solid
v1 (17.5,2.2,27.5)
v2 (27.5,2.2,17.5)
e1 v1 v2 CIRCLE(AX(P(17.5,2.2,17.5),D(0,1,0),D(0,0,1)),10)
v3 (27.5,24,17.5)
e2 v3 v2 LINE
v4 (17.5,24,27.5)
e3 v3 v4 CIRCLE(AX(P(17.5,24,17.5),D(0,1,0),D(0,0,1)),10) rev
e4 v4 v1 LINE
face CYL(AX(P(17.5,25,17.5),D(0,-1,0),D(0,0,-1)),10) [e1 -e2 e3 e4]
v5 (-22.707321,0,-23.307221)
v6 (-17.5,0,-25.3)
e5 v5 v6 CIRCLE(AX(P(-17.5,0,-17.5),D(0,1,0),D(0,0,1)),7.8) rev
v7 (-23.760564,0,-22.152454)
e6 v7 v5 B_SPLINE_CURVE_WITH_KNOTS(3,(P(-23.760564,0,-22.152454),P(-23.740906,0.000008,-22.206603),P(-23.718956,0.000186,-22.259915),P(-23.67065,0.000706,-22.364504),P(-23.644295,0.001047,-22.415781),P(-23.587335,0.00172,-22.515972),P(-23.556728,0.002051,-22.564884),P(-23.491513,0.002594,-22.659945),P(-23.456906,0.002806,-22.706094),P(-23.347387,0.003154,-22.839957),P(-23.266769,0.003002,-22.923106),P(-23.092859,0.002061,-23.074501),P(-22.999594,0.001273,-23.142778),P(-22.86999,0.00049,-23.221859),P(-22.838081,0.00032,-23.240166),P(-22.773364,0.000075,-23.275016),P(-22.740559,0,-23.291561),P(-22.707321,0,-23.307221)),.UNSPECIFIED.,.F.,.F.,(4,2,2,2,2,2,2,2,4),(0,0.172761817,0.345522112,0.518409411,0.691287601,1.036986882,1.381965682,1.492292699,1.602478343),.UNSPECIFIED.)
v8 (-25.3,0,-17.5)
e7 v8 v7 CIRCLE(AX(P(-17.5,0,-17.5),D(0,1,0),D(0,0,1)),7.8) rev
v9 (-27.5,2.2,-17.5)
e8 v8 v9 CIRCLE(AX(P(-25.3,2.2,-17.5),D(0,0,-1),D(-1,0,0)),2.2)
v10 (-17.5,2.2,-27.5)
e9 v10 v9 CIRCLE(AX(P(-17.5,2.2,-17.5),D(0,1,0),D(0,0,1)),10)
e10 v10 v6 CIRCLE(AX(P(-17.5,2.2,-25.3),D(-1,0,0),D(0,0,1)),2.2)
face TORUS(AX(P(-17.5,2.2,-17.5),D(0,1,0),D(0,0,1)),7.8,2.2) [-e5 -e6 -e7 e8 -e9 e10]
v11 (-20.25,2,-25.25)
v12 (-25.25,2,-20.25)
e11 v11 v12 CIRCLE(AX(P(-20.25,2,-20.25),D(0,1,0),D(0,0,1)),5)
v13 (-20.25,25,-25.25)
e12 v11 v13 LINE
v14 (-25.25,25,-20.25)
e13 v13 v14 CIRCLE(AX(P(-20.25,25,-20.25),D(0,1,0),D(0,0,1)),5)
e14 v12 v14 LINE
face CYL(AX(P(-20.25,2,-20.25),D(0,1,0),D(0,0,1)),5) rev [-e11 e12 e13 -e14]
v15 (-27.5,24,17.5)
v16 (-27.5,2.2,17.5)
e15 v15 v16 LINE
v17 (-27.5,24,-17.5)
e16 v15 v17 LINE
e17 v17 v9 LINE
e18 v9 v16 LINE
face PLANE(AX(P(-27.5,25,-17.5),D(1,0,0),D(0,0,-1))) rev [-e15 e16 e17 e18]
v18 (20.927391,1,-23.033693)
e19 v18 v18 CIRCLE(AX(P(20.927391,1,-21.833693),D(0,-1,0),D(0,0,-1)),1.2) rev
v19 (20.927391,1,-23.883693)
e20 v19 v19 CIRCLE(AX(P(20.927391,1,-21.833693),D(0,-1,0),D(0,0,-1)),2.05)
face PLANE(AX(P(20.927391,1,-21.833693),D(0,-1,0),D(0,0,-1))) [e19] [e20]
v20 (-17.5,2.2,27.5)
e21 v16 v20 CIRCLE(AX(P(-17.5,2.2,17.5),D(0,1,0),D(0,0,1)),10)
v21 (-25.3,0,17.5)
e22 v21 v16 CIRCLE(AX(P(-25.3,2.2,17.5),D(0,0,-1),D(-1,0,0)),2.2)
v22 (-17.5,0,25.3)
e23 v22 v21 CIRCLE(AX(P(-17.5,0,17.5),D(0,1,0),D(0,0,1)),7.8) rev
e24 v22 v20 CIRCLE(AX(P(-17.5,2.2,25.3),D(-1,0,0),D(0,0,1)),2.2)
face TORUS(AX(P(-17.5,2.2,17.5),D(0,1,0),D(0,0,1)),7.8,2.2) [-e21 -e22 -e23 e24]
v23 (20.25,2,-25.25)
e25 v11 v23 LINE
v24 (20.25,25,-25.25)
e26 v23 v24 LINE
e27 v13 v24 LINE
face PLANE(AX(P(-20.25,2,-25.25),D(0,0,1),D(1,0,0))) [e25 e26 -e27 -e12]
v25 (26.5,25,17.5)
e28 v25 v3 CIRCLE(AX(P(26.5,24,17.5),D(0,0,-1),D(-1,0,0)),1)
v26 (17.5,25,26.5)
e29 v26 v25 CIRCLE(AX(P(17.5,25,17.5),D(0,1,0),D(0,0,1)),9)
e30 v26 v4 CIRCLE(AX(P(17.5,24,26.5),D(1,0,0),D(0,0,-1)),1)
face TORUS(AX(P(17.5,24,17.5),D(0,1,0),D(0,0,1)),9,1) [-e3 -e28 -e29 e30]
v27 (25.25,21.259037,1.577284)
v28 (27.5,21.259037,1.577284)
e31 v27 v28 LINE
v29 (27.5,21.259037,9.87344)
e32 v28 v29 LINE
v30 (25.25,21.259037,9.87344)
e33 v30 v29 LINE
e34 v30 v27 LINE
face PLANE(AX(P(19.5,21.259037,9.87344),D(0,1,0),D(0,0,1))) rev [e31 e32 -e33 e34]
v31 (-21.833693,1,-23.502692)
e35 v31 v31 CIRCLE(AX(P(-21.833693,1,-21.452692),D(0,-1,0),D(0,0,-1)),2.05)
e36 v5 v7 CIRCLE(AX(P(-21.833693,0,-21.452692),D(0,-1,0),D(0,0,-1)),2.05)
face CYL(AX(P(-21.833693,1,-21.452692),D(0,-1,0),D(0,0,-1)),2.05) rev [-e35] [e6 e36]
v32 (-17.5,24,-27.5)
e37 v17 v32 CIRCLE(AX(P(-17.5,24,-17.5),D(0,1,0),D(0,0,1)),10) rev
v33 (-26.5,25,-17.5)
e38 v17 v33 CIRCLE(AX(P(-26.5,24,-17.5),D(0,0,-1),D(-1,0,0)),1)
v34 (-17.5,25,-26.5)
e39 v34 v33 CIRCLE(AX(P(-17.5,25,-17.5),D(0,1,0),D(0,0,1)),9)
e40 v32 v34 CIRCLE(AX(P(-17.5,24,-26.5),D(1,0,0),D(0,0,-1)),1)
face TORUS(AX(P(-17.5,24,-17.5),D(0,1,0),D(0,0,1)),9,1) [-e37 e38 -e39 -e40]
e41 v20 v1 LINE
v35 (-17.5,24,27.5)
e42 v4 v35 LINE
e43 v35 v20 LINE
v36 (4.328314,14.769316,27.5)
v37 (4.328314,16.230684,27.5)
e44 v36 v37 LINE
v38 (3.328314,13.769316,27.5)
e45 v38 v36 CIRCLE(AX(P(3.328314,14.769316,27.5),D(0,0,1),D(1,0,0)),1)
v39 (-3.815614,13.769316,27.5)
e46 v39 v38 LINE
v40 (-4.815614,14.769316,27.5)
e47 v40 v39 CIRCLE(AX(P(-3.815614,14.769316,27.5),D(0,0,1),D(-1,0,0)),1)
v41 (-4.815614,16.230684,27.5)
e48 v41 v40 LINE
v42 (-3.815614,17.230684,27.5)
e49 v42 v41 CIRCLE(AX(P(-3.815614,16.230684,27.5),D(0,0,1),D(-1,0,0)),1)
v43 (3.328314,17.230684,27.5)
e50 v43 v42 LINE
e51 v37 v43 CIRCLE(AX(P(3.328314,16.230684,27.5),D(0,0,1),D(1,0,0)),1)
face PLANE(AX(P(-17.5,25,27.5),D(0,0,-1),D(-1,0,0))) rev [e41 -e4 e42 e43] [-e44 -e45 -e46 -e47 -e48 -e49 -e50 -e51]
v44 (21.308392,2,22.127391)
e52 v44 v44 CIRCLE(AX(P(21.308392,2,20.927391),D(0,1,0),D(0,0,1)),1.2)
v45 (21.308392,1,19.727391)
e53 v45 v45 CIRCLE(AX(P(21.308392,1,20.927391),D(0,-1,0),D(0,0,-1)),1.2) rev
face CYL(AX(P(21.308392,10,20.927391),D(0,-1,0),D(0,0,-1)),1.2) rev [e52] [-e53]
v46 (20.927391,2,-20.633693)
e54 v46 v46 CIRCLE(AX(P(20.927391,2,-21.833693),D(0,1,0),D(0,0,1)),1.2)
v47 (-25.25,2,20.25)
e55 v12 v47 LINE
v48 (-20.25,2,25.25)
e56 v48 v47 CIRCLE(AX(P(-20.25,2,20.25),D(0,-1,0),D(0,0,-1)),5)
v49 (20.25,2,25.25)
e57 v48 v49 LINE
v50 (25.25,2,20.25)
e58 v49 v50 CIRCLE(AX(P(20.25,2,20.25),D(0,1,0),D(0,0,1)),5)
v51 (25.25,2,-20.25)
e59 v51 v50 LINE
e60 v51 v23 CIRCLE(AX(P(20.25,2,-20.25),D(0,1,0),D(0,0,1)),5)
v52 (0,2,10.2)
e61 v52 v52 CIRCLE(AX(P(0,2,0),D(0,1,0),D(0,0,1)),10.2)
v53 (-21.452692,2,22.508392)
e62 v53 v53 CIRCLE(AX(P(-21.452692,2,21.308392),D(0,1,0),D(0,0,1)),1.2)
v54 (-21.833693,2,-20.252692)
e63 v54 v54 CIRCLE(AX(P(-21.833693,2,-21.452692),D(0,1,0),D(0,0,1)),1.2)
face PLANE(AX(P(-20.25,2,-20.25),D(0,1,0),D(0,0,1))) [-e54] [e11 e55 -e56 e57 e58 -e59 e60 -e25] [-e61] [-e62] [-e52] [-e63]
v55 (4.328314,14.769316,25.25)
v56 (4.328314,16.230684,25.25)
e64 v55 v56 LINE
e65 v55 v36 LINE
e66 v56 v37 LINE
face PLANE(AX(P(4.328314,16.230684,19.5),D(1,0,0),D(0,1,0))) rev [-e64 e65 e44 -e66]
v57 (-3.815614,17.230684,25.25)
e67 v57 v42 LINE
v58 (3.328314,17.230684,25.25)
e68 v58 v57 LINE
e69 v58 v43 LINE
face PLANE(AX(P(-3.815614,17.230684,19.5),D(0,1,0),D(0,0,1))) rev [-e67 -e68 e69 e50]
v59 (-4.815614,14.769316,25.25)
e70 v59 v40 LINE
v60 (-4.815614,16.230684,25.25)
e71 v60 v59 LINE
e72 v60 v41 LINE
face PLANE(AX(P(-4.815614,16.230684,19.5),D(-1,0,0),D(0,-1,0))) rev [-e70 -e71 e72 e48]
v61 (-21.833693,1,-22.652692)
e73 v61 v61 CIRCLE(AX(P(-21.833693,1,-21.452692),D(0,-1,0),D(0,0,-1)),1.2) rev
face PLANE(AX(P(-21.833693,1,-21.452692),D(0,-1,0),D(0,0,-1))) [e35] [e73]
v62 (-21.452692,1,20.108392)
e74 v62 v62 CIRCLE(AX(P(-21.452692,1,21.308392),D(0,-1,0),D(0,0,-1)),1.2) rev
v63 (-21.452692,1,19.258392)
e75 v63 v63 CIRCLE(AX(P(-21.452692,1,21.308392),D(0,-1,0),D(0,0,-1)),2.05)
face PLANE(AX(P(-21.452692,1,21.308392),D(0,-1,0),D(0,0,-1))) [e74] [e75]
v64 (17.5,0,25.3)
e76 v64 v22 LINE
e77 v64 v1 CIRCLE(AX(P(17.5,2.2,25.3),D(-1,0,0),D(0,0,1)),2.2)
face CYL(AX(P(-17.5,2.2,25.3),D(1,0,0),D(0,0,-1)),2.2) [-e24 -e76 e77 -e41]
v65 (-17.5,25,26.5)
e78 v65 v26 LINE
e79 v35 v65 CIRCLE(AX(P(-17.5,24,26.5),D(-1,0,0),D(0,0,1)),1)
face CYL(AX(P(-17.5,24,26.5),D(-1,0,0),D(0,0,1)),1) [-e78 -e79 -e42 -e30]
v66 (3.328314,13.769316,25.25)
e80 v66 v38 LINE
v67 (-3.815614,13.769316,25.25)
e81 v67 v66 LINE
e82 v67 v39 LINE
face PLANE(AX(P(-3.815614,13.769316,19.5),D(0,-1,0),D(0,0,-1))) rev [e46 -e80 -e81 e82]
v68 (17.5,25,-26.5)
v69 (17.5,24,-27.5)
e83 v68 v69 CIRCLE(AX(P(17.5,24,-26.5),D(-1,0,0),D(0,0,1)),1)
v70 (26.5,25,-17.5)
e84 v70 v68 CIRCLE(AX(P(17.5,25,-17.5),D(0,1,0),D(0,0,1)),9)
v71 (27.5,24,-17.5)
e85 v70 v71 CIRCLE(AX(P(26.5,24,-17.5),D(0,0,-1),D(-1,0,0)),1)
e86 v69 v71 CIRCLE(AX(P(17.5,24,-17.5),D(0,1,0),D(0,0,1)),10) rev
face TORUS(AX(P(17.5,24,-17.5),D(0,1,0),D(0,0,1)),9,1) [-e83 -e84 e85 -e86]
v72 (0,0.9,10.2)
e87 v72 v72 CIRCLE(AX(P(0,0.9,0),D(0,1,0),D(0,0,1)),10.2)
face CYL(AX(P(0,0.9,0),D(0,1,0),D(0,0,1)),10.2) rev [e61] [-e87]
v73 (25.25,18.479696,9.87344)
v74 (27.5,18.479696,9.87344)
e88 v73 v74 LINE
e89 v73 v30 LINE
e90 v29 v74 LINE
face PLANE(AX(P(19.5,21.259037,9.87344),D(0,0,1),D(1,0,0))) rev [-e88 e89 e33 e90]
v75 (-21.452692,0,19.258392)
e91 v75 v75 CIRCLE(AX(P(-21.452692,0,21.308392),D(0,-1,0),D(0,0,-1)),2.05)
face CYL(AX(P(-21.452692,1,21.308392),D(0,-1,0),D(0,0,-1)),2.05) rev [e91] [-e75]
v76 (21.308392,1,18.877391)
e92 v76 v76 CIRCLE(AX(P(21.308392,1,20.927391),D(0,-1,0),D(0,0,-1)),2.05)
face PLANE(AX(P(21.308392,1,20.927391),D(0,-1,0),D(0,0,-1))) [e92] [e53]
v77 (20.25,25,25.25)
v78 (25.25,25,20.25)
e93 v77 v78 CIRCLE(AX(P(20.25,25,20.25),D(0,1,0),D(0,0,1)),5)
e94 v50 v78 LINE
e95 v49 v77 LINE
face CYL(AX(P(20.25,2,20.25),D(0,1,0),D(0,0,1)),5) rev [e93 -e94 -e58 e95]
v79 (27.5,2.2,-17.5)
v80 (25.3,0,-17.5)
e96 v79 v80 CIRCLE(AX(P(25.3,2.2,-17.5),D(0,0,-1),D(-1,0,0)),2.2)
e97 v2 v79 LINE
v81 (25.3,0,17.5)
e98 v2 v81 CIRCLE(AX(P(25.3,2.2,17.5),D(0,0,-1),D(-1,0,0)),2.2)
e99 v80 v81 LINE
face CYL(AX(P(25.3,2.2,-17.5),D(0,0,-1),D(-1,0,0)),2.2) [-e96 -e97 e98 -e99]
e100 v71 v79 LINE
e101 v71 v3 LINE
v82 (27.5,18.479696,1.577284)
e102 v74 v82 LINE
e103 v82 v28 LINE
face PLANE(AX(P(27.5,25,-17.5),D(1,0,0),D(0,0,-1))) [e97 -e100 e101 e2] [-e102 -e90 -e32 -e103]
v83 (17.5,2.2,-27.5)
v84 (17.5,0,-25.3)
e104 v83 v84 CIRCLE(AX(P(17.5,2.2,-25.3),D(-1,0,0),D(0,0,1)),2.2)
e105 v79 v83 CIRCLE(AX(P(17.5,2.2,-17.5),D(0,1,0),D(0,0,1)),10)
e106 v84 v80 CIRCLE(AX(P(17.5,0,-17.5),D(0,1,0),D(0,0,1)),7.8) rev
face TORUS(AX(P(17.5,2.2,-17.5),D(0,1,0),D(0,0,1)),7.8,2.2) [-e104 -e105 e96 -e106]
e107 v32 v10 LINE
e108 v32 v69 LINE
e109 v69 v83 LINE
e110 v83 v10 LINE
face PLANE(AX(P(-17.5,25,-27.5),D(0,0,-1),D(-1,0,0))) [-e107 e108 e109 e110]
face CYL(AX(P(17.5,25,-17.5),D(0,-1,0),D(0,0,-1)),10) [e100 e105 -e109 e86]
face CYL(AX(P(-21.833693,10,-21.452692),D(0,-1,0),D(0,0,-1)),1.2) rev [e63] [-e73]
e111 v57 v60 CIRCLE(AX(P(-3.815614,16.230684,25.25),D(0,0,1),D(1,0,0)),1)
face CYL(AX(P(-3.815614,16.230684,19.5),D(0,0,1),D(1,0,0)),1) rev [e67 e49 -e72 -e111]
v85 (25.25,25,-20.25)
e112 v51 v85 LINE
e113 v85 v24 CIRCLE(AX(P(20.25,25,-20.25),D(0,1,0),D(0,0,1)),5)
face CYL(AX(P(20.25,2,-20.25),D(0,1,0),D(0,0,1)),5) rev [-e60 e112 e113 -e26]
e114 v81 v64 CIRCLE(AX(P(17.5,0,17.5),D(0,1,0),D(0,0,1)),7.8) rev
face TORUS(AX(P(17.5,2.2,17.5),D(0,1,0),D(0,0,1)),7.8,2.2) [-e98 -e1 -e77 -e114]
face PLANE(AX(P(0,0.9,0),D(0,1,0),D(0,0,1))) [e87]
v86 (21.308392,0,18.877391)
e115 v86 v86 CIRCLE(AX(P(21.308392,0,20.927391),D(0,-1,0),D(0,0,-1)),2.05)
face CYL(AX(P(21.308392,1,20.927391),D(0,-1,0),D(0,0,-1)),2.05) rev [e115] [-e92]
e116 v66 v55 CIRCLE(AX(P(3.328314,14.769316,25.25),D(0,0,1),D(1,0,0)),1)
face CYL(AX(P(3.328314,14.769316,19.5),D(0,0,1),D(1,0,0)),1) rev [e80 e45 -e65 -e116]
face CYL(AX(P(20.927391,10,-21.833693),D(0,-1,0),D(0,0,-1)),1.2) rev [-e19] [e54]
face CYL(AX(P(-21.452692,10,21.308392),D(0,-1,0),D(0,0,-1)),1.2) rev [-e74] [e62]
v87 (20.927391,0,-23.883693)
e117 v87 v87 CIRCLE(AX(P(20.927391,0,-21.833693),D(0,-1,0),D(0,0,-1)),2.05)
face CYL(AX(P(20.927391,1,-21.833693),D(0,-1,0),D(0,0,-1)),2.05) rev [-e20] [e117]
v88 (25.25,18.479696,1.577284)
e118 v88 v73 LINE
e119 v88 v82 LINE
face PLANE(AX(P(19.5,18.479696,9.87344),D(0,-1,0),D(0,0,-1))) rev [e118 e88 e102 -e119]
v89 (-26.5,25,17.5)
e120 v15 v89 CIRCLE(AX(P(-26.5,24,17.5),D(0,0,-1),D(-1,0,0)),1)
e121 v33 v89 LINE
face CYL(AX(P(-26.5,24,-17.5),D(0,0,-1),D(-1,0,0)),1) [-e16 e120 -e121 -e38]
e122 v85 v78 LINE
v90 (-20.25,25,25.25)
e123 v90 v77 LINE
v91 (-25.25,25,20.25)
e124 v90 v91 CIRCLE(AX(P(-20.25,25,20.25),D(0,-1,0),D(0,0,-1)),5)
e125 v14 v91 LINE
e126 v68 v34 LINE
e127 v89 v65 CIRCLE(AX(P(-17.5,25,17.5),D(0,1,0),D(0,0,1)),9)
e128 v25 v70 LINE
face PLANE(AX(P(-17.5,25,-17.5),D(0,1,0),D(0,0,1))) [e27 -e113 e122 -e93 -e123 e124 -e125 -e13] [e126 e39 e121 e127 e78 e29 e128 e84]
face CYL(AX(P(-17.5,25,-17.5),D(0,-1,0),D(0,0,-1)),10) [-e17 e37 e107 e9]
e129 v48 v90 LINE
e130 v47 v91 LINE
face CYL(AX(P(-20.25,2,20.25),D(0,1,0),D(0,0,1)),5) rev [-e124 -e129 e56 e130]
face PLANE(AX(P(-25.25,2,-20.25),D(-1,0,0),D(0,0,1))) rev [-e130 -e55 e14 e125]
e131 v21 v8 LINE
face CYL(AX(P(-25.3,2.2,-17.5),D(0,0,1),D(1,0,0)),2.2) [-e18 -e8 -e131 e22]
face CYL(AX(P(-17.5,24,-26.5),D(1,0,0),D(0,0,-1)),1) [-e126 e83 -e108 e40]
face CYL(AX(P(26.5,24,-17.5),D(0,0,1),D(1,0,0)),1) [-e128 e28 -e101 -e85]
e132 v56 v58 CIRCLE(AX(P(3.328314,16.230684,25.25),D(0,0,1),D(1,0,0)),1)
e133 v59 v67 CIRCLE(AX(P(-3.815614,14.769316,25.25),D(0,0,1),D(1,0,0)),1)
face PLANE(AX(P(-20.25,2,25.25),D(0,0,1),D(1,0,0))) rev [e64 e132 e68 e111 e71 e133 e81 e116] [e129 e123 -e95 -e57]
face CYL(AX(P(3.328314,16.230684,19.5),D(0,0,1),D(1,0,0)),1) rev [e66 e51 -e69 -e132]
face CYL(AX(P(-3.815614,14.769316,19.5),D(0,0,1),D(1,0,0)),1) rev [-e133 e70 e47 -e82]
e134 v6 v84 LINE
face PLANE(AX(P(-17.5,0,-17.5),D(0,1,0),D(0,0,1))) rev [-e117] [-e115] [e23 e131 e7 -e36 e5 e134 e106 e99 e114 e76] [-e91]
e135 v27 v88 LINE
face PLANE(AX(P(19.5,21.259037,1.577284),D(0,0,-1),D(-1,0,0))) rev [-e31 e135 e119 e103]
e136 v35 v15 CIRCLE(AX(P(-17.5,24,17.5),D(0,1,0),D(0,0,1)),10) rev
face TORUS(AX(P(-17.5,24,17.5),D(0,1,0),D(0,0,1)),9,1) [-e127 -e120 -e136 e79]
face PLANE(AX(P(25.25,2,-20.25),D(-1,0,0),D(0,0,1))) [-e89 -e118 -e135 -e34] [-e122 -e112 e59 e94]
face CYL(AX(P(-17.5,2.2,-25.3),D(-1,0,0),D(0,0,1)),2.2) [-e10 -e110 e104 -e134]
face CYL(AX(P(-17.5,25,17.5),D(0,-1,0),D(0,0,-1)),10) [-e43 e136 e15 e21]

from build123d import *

# Parameters (mm, degrees)
EXTRUDE_2_DEPTH      = 25
CUT_EXTRUDE_1_DEPTH  = 23
SKETCH_4_R           = 1.2
CUT_EXTRUDE_2_DEPTH  = 10
SKETCH_5_R           = 2.05
CUT_EXTRUDE_3_DEPTH  = 1
CUT_EXTRUDE_4_DEPTH  = 8
SKETCH_8_W           = 8.296155167
SKETCH_8_H           = 2.779340605
CUT_EXTRUDE_9_DEPTH  = 8
SKETCH_11_R          = 10.2
CUT_EXTRUDE_11_DEPTH = 1.1
FILLET_3_R           = 2.2
FILLET_4_R           = 1


with BuildPart() as part:
    # 草图1 → 凸台-拉伸2 (new body)
    with BuildSketch(Plane(origin=(0, 0, 0), x_dir=(1, 0, 0), z_dir=(0, 1, 0))):
        with BuildLine():
            Line((-17.5, 27.5), (17.5, 27.5))
            ThreePointArc((17.5, 27.5), (24.571067812, 24.571067812), (27.5, 17.5))
            Line((27.5, 17.5), (27.5, -17.5))
            ThreePointArc((27.5, -17.5), (24.571067812, -24.571067812), (17.5, -27.5))
            Line((17.5, -27.5), (-17.5, -27.5))
            ThreePointArc((-17.5, -27.5), (-24.571067812, -24.571067812), (-27.5, -17.5))
            Line((-27.5, -17.5), (-27.5, 17.5))
            ThreePointArc((-27.5, 17.5), (-24.571067812, 24.571067812), (-17.5, 27.5))
        make_face()
    extrude(amount=EXTRUDE_2_DEPTH)

    # 草图3 → 切除-拉伸1 (cut)
    with BuildSketch(Plane(origin=(0, 25, 0), x_dir=(1, 0, 0), z_dir=(0, 1, 0))):
        with BuildLine():
            Line((-20.25, 25.25), (20.25, 25.25))
            ThreePointArc((20.25, 25.25), (23.785533906, 23.785533906), (25.25, 20.25))
            Line((25.25, 20.25), (25.25, -20.25))
            ThreePointArc((25.25, -20.25), (23.785533906, -23.785533906), (20.25, -25.25))
            Line((20.25, -25.25), (-20.25, -25.25))
            ThreePointArc((-20.25, -25.25), (-23.785533906, -23.785533906), (-25.25, -20.25))
            Line((-25.25, -20.25), (-25.25, 20.25))
            ThreePointArc((-25.25, 20.25), (-23.785533906, 23.785533906), (-20.25, 25.25))
        make_face()
    extrude(amount=-CUT_EXTRUDE_1_DEPTH, mode=Mode.SUBTRACT)

    # 草图4 → 切除-拉伸2 (cut)
    with BuildSketch(Plane.XZ):
        with Locations(Location((-21.452692405, 21.308392177, 0), (0, 0, 270))):
            Circle(SKETCH_4_R)
        with Locations(Location((21.308392177, 20.927391415, 0), (0, 0, 270))):
            Circle(SKETCH_4_R)
        with Locations(Location((-21.833693167, -21.452692405, 0), (0, 0, 270))):
            Circle(SKETCH_4_R)
        with Locations(Location((20.927391415, -21.833693167, 0), (0, 0, 270))):
            Circle(SKETCH_4_R)
    extrude(amount=-CUT_EXTRUDE_2_DEPTH, mode=Mode.SUBTRACT)

    # 草图5 → 切除-拉伸3 (cut)
    with BuildSketch(Plane.XZ):
        with Locations(Location((-21.452692405, 21.308392177, 0), (0, 0, 270))):
            Circle(SKETCH_5_R)
        with Locations(Location((21.308392177, 20.927391415, 0), (0, 0, 270))):
            Circle(SKETCH_5_R)
        with Locations(Location((-21.833693167, -21.452692405, 0), (0, 0, 270))):
            Circle(SKETCH_5_R)
        with Locations(Location((20.927391415, -21.833693167, 0), (0, 0, 270))):
            Circle(SKETCH_5_R)
    extrude(amount=-CUT_EXTRUDE_3_DEPTH, mode=Mode.SUBTRACT)

    # 草图7 → 切除-拉伸4 (cut)
    with BuildSketch(Plane.XY.offset(27.5)):
        with BuildLine():
            Line((-3.815614102, 17.230683857), (3.328314128, 17.230683857))
            ThreePointArc((3.328314128, 17.230683857), (4.035420909, 16.937790638), (4.328314128, 16.230683857))
            Line((4.328314128, 16.230683857), (4.328314128, 14.769316156))
            ThreePointArc((4.328314128, 14.769316156), (4.035420909, 14.062209375), (3.328314128, 13.769316156))
            Line((3.328314128, 13.769316156), (-3.815614102, 13.769316156))
            ThreePointArc((-3.815614102, 13.769316156), (-4.522720884, 14.062209375), (-4.815614102, 14.769316156))
            Line((-4.815614102, 14.769316156), (-4.815614102, 16.230683857))
            ThreePointArc((-4.815614102, 16.230683857), (-4.522720884, 16.937790638), (-3.815614102, 17.230683857))
        make_face()
    extrude(amount=-CUT_EXTRUDE_4_DEPTH, mode=Mode.SUBTRACT)

    # 草图8 → 切除-拉伸9 (cut)
    with BuildSketch(Plane(origin=(27.5, 0, 0), x_dir=(0, 0, -1), z_dir=(1, 0, 0))):
        with Locations((-5.725361951, 19.869366797)):
            Rectangle(SKETCH_8_W, SKETCH_8_H)
    extrude(amount=-CUT_EXTRUDE_9_DEPTH, mode=Mode.SUBTRACT)

    # 草图11 → 切除-拉伸11 (cut)
    with BuildSketch(Plane(origin=(0, 2, 0), x_dir=(1, 0, 0), z_dir=(0, 1, 0))):
        with Locations(Location((0, 0, 0), (0, 0, 270))):
            Circle(SKETCH_11_R)
    extrude(amount=-CUT_EXTRUDE_11_DEPTH, mode=Mode.SUBTRACT)

    # 圆角3
    # the kernel refuses this fillet: 2.2 mm, written as the material it takes off along each edge
    with BuildSketch(Plane(origin=(17.5, 0, 27.5), x_dir=(0, 0, -1), z_dir=(-1, 0, 0)), Plane(origin=(-27.5, 0, 17.5), x_dir=(1, 0, 0), z_dir=(0, 0, -1)), Plane(origin=(27.5, 0, -17.5), x_dir=(-1, 0, 0), z_dir=(0, 0, 1))) as fillet_3_piece_1:
        with BuildLine():
            CenterArc((FILLET_3_R, -FILLET_3_R), FILLET_3_R, 90, 90)
            Line((0, -FILLET_3_R), (0, 0))
            Line((0, 0), (FILLET_3_R, 0))
        make_face()
    extrude(amount=35, mode=Mode.SUBTRACT)
    with BuildSketch(Plane(origin=(-17.5, 0, 17.5), x_dir=(0, 0, 1), z_dir=(1, 0, 0))) as fillet_3_piece_2:
        with BuildLine():
            CenterArc((10 - FILLET_3_R, -FILLET_3_R), FILLET_3_R, 0, 90)
            Line((10, -FILLET_3_R), (10, 0))
            Line((10, 0), (10 - FILLET_3_R, 0))
        make_face()
    revolve(axis=Axis((-17.5, 0, 17.5), (0, -1, 0)), revolution_arc=90, mode=Mode.SUBTRACT)
    with BuildSketch(Plane(origin=(-17.5, 0, -17.5), x_dir=(-1, 0, 0), z_dir=(0, 0, 1))) as fillet_3_piece_3:
        with BuildLine():
            CenterArc((10 - FILLET_3_R, -FILLET_3_R), FILLET_3_R, 0, 90)
            Line((10 - FILLET_3_R, 0), (10, 0))
            Line((10, 0), (10, -FILLET_3_R))
        make_face()
    revolve(axis=Axis((-17.5, 0, -17.5), (0, -1, 0)), revolution_arc=90, mode=Mode.SUBTRACT)
    with BuildSketch(Plane(origin=(-17.5, 0, -27.5), x_dir=(0, 1, 0), z_dir=(1, 0, 0))) as fillet_3_piece_4:
        with BuildLine():
            CenterArc((FILLET_3_R, FILLET_3_R), FILLET_3_R, 180, 90)
            Line((0, FILLET_3_R), (0, 0))
            Line((0, 0), (FILLET_3_R, 0))
        make_face()
    extrude(amount=35, mode=Mode.SUBTRACT)
    with BuildSketch(Plane(origin=(17.5, 0, -17.5), x_dir=(0, 0, -1), z_dir=(-1, 0, 0))) as fillet_3_piece_5:
        with BuildLine():
            CenterArc((10 - FILLET_3_R, -FILLET_3_R), FILLET_3_R, 0, 90)
            Line((10 - FILLET_3_R, 0), (10, 0))
            Line((10, 0), (10, -FILLET_3_R))
        make_face()
    revolve(axis=Axis((17.5, 0, -17.5), (0, -1, 0)), revolution_arc=90, mode=Mode.SUBTRACT)
    with BuildSketch(Plane(origin=(17.5, 0, 17.5), x_dir=(1, 0, 0), z_dir=(0, 0, -1))) as fillet_3_piece_6:
        with BuildLine():
            CenterArc((10 - FILLET_3_R, -FILLET_3_R), FILLET_3_R, 0, 90)
            Line((10, -FILLET_3_R), (10, 0))
            Line((10, 0), (10 - FILLET_3_R, 0))
        make_face()
    revolve(axis=Axis((17.5, 0, 17.5), (0, -1, 0)), revolution_arc=90, mode=Mode.SUBTRACT)

    # 圆角4
    fillet_4_edges = [part.edges().sort_by_distance(p)[0] for p in [
        (-24.571067812, 25, 24.571067812),
        (0, 25, 27.5),
        (24.571067812, 25, 24.571067812),
        (27.5, 25, 0),
        (24.571067812, 25, -24.571067812),
        (0, 25, -27.5),
        (-24.571067812, 25, -24.571067812),
        (-27.5, 25, 0),
    ]]
    fillet(fillet_4_edges, radius=FILLET_4_R)


solid = part.part
